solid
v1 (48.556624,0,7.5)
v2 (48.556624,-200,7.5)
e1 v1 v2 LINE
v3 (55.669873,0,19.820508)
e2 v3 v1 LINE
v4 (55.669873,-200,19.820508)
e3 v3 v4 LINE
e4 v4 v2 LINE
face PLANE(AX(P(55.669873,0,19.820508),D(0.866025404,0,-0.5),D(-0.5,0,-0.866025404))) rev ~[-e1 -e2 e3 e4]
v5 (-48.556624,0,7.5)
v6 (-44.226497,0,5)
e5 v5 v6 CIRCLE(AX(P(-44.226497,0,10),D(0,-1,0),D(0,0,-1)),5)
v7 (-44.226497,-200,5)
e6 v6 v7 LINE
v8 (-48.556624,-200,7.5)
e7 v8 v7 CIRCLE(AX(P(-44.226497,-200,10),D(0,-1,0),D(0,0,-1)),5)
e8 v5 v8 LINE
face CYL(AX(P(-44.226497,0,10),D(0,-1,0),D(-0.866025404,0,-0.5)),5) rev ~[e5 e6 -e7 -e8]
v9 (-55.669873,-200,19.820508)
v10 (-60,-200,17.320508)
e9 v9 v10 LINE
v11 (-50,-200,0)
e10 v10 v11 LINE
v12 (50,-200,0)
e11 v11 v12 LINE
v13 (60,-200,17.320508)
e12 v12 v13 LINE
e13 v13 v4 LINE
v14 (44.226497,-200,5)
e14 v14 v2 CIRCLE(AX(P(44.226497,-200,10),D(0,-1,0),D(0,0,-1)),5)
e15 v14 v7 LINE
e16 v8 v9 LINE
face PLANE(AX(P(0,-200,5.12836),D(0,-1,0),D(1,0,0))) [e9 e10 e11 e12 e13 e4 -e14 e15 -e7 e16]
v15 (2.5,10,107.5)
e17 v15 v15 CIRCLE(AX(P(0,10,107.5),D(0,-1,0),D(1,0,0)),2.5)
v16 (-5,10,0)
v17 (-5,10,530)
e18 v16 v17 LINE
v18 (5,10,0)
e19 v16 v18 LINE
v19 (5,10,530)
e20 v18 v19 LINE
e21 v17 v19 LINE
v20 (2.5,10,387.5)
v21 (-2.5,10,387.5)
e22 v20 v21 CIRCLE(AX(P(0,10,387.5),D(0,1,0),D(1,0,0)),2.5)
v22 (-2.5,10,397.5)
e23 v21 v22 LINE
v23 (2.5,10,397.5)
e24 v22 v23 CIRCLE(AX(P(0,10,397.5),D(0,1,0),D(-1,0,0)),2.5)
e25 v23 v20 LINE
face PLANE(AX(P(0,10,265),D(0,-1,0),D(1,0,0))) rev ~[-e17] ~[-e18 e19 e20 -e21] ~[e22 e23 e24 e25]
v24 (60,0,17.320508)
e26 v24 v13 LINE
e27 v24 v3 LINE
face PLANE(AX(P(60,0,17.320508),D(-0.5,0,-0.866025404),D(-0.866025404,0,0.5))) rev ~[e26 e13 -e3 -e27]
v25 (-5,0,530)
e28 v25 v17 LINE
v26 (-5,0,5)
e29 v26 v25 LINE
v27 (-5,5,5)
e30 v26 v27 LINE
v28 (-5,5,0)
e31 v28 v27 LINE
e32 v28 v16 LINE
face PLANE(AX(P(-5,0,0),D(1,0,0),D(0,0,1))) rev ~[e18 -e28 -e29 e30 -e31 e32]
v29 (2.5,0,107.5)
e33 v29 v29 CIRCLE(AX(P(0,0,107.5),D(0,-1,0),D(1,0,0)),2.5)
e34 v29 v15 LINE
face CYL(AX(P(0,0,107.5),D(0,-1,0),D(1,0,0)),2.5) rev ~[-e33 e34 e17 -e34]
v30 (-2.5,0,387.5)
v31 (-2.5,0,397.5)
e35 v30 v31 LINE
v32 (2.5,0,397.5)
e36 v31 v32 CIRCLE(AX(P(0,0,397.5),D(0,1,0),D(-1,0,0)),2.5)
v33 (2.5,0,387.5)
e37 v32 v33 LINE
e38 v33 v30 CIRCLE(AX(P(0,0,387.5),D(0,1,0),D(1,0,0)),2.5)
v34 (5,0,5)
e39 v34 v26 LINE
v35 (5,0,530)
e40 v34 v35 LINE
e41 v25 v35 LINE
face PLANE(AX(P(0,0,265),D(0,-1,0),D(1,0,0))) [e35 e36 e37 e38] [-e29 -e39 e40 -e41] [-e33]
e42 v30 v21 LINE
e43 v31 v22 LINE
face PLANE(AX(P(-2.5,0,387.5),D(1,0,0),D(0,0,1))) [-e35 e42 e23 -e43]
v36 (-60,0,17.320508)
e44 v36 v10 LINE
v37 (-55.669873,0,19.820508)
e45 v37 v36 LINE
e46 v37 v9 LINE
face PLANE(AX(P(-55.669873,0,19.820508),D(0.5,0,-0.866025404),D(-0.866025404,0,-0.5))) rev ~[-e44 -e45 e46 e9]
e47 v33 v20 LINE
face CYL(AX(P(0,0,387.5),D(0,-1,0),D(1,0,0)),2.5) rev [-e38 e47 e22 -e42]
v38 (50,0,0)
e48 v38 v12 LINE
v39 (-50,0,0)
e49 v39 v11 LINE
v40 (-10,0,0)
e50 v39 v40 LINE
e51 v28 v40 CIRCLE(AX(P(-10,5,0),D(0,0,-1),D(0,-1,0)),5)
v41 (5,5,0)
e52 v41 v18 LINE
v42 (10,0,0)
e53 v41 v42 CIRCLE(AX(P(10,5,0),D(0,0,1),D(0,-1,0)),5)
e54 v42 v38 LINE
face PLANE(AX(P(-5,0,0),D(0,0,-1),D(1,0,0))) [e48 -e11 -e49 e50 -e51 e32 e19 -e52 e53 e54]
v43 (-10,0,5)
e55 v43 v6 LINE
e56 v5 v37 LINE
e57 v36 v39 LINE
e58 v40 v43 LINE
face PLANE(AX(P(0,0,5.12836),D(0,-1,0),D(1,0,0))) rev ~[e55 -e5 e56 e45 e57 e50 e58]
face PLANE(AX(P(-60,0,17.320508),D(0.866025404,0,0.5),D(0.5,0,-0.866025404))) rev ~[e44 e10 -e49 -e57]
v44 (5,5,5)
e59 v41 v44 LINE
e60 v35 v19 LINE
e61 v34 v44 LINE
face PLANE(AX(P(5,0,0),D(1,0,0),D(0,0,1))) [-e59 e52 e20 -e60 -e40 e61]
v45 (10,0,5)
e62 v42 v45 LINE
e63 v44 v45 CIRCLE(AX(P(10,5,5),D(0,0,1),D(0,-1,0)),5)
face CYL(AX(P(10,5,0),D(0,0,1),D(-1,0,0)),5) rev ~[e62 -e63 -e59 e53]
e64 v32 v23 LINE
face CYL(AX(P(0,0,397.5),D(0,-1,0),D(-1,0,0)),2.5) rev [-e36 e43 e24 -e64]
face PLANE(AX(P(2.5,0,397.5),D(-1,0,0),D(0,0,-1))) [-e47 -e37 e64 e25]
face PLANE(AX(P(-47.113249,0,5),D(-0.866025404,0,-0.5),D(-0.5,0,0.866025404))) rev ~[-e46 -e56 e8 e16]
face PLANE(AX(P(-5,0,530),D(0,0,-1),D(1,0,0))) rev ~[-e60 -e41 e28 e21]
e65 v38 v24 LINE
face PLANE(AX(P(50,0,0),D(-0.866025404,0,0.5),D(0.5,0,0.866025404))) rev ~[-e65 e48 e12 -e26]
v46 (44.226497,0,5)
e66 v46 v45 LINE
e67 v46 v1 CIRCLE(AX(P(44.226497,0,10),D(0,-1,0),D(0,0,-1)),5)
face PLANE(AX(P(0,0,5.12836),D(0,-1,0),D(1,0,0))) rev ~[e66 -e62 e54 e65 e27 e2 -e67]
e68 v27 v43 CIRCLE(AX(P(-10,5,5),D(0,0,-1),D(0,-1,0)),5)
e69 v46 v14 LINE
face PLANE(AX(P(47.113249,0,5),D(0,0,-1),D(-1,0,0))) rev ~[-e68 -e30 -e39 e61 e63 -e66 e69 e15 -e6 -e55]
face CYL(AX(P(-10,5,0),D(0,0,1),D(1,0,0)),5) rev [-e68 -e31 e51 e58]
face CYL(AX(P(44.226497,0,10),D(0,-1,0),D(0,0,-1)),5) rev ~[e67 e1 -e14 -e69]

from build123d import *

# Parameters (mm, degrees)
F1_DEPTH = 200
F2_W     = 10
F2_H     = 530
F2_R     = 2.5
F3_DEPTH = 10
F4_R     = 5


with BuildPart() as f1:
    # F0 (on Front) → F1 (new body)
    with BuildSketch(Plane.XZ):
        Polygon((-60, 17.3205080757), (-50, 0), (0, 0), (50, 0), (60, 17.3205080757), (55.6698729811, 19.8205080757), (47.1132486541, 5), (0, 5), (-47.1132486541, 5), (-55.6698729811, 19.8205080757), align=None)
    extrude(amount=F1_DEPTH)

    # F2 (on Front) → F3 (join)
    with BuildSketch(Plane.XZ):
        with Locations((0, 265)):
            Rectangle(F2_W, F2_H)
        with Locations((0, 107.5)):
            Circle(F2_R, mode=Mode.SUBTRACT)
        with BuildLine():
            ThreePointArc((-2.5, 397.5), (0, 400), (2.5, 397.5))
            Line((2.5, 397.5), (2.5, 387.5))
            ThreePointArc((2.5, 387.5), (0, 385), (-2.5, 387.5))
            Line((-2.5, 387.5), (-2.5, 397.5))
        make_face(mode=Mode.SUBTRACT)
    extrude(amount=-F3_DEPTH)

    # F4
    f4_edges = [f1.edges().sort_by_distance(p)[0] for p in [
        (47.113249, -100, 5),
        (-47.113249, -100, 5),
        (5, 0, 2.5),
        (-5, 0, 2.5),
    ]]
    fillet(f4_edges, radius=F4_R)


solid = f1.part
